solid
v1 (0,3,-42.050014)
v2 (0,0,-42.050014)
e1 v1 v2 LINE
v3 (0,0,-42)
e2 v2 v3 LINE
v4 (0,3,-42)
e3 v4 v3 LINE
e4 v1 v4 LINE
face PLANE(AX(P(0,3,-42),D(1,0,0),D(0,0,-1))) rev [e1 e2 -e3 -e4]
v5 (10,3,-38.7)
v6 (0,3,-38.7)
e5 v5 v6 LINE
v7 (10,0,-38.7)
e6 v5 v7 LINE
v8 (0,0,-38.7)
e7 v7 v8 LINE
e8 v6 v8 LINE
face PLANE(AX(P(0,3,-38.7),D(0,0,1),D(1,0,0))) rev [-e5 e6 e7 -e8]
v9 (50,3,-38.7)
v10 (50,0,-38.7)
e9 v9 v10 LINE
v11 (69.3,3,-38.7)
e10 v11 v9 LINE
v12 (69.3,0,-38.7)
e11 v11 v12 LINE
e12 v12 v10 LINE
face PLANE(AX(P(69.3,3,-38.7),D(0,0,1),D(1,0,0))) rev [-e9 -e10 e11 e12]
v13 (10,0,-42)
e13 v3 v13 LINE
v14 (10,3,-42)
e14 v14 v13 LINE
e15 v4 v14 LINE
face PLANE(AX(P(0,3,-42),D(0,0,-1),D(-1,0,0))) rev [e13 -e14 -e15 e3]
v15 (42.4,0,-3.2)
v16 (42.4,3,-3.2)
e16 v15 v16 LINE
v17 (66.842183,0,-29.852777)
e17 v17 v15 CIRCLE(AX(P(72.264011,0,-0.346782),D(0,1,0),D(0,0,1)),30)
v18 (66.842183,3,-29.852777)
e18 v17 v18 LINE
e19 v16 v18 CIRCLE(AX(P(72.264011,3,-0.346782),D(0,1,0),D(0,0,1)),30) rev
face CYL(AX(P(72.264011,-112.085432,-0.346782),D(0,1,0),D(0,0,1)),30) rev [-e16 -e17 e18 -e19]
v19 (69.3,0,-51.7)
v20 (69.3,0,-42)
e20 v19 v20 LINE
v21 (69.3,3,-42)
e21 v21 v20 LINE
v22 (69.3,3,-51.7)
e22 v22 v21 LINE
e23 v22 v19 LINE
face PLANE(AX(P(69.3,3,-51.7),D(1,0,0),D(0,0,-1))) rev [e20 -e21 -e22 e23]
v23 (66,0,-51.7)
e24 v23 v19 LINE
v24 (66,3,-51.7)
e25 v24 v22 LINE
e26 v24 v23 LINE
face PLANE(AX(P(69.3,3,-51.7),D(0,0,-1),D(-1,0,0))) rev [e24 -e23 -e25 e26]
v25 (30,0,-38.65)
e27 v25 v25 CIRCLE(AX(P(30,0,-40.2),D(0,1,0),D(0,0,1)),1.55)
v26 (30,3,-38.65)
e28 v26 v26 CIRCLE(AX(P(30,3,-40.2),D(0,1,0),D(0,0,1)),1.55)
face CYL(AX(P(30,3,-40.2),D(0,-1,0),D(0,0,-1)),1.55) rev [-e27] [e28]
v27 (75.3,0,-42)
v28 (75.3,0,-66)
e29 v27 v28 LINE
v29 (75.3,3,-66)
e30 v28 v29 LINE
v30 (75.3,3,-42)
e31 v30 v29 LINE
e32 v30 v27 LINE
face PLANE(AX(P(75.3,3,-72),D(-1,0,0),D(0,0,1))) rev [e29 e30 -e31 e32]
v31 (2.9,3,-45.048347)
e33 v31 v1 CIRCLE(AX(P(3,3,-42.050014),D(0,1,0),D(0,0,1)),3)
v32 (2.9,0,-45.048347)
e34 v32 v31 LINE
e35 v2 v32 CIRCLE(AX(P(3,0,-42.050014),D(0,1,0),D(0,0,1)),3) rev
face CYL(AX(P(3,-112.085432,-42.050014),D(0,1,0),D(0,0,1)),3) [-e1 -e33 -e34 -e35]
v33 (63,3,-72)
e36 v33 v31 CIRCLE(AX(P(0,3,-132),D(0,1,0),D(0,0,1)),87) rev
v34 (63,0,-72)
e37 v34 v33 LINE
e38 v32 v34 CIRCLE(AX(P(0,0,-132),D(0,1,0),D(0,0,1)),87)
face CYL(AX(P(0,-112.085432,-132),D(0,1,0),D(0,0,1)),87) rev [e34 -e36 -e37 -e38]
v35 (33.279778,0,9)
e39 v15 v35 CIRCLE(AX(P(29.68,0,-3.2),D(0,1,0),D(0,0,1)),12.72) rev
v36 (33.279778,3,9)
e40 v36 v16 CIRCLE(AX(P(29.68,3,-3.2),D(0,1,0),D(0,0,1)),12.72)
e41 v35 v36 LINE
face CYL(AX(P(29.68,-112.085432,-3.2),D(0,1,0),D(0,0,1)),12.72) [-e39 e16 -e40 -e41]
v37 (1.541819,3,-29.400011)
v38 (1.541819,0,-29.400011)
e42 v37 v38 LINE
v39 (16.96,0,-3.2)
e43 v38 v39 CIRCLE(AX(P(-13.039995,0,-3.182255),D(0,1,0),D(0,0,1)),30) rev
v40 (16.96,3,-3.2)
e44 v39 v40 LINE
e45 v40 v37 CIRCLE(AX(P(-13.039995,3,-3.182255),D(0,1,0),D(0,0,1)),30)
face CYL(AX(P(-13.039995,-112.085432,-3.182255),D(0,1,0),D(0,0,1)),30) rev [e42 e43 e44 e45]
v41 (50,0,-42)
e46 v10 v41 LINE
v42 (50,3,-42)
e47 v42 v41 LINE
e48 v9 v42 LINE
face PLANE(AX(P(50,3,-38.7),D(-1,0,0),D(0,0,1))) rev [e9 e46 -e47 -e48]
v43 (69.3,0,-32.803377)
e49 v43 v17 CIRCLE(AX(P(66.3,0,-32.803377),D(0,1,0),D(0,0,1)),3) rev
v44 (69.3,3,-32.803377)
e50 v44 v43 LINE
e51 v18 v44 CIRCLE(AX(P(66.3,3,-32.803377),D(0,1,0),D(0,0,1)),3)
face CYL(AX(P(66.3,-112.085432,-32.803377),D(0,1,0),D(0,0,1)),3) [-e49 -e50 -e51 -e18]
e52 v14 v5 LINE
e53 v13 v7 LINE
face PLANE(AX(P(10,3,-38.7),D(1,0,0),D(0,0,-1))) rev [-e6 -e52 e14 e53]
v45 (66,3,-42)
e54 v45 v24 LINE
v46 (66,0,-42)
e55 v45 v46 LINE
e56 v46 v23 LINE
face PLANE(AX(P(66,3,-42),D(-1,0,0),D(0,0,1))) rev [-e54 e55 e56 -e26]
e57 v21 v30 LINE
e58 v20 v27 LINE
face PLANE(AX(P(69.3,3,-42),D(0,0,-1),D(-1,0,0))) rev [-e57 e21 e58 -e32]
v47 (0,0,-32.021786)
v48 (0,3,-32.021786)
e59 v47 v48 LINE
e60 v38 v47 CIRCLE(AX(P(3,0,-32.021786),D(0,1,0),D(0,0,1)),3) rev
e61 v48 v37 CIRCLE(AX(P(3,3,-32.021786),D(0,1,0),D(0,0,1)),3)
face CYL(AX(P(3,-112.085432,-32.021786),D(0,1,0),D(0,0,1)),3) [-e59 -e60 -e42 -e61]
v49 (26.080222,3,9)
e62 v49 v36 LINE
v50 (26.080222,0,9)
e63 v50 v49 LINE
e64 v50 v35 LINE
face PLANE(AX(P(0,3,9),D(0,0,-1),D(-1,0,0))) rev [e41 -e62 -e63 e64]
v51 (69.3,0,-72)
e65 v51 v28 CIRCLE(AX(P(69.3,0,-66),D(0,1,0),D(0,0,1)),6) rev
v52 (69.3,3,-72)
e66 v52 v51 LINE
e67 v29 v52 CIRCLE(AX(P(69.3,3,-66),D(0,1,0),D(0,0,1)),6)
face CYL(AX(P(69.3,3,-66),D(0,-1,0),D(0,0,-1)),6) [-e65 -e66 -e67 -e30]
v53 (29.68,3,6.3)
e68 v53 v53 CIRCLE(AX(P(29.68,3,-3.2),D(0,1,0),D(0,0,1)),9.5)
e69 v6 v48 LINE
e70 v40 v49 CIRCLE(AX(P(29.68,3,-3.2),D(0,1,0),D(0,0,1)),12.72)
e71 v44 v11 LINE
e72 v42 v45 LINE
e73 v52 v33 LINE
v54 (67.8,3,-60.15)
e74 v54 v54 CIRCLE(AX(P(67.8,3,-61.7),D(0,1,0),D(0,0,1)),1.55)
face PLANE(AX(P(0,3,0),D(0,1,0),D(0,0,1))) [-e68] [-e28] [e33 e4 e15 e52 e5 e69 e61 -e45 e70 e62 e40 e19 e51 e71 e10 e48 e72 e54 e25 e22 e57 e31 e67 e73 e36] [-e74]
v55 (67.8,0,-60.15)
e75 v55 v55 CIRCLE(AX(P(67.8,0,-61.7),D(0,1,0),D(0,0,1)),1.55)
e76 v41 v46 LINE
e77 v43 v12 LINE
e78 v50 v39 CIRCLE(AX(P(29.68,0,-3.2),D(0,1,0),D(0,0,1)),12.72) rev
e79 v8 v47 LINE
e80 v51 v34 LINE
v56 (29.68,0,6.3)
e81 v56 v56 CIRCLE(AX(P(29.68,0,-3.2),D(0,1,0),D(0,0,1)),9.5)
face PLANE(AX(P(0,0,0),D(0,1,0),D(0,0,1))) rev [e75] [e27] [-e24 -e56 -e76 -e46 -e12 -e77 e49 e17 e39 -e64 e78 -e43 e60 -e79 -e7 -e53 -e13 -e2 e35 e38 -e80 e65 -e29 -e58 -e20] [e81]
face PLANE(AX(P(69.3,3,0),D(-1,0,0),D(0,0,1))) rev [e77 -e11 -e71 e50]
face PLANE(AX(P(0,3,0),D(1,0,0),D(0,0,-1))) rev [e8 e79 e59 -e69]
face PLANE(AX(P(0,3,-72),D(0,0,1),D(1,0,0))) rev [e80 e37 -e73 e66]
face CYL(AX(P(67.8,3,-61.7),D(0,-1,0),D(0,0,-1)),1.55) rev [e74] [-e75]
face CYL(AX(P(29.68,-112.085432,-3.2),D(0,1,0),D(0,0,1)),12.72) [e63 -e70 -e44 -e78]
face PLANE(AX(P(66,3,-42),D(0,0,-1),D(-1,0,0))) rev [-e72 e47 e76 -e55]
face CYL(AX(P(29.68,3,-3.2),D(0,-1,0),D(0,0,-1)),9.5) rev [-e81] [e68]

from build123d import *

# Parameters (mm, degrees)
CROQUIS1_R               = 1.55
CROQUIS1_R_2             = 9.5
SALIENTE_EXTRUIR10_DEPTH = 3
CORTAR_EXTRUIR2_START    = -3
CORTAR_EXTRUIR2_DEPTH    = 3
REDONDEO1_R              = 6
REDONDEO2_R              = 3


# Read off the part's stored shape, not the designer's step: Cortar-Extruir2
with BuildPart() as part:
    # Croquis1 → Saliente-Extruir10 (new body)
    with BuildSketch(Plane(origin=(0, 0, 0), x_dir=(1, 0, 0), z_dir=(0, 1, 0))):
        Polygon((0, 0), (0, 38.7), (10, 38.7), (10, 42), (0, 42), (0, 72), (69.3, 72), (75.3, 72), (75.3, 52), (75.3, 42), (69.3, 42), (69.3, 51.7), (66, 51.7), (66, 42), (50, 42), (50, 38.7), (69.3, 38.7), (69.3, 0), (69.3, -9), (0, -9), align=None)
        with Locations(Location((30, 40.2, 0), (0, 0, 270))):
            Circle(CROQUIS1_R, mode=Mode.SUBTRACT)
        with Locations(Location((67.8, 61.7, 0), (0, 0, 270))):
            Circle(CROQUIS1_R, mode=Mode.SUBTRACT)
        with Locations(Location((29.68, 3.2, 0), (0, 0, 270))):
            Circle(CROQUIS1_R_2, mode=Mode.SUBTRACT)
    extrude(amount=SALIENTE_EXTRUIR10_DEPTH)

    # Cortar-Extruir2 outline → Cortar-Extruir2 (cut)
    with BuildSketch(Plane(origin=(0, 3, 0), x_dir=(1, 0, 0), z_dir=(0, 1, 0)).offset(CORTAR_EXTRUIR2_START)):
        with BuildLine():
            ThreePointArc((26.080222229, -9), (19.492076432, -4.416075983), (16.96, 3.2))
            ThreePointArc((16.96, 3.2), (12.363945378, 19.139693097), (0, 30.2))
            Line((0, 30.2), (0, -9))
            Line((0, -9), (26.080222229, -9))
        make_face()
        with BuildLine():
            ThreePointArc((42.4, 3.2), (39.867923568, -4.416075983), (33.279777771, -9))
            Line((33.279777771, -9), (69.3, -9))
            Line((69.3, -9), (69.3, 30.2))
            ThreePointArc((69.3, 30.2), (51.011487425, 21.520592158), (42.4, 3.2))
        make_face()
        with BuildLine():
            Line((0, 72), (0, 45))
            ThreePointArc((0, 45), (34.270978976, 52.034382388), (63, 72))
            Line((63, 72), (0, 72))
        make_face()
    extrude(amount=CORTAR_EXTRUIR2_DEPTH, mode=Mode.SUBTRACT)

    # Redondeo1
    redondeo1_edges = [part.edges().sort_by_distance(p)[0] for p in [
        (75.3, 1.5, -72),
    ]]
    fillet(redondeo1_edges, radius=REDONDEO1_R)

    # Redondeo2
    redondeo2_edges = [part.edges().sort_by_distance(p)[0] for p in [
        (69.3, 1.5, -30.2),
        (0, 1.5, -45),
        (0, 1.5, -30.2),
    ]]
    fillet(redondeo2_edges, radius=REDONDEO2_R)


solid = part.part
